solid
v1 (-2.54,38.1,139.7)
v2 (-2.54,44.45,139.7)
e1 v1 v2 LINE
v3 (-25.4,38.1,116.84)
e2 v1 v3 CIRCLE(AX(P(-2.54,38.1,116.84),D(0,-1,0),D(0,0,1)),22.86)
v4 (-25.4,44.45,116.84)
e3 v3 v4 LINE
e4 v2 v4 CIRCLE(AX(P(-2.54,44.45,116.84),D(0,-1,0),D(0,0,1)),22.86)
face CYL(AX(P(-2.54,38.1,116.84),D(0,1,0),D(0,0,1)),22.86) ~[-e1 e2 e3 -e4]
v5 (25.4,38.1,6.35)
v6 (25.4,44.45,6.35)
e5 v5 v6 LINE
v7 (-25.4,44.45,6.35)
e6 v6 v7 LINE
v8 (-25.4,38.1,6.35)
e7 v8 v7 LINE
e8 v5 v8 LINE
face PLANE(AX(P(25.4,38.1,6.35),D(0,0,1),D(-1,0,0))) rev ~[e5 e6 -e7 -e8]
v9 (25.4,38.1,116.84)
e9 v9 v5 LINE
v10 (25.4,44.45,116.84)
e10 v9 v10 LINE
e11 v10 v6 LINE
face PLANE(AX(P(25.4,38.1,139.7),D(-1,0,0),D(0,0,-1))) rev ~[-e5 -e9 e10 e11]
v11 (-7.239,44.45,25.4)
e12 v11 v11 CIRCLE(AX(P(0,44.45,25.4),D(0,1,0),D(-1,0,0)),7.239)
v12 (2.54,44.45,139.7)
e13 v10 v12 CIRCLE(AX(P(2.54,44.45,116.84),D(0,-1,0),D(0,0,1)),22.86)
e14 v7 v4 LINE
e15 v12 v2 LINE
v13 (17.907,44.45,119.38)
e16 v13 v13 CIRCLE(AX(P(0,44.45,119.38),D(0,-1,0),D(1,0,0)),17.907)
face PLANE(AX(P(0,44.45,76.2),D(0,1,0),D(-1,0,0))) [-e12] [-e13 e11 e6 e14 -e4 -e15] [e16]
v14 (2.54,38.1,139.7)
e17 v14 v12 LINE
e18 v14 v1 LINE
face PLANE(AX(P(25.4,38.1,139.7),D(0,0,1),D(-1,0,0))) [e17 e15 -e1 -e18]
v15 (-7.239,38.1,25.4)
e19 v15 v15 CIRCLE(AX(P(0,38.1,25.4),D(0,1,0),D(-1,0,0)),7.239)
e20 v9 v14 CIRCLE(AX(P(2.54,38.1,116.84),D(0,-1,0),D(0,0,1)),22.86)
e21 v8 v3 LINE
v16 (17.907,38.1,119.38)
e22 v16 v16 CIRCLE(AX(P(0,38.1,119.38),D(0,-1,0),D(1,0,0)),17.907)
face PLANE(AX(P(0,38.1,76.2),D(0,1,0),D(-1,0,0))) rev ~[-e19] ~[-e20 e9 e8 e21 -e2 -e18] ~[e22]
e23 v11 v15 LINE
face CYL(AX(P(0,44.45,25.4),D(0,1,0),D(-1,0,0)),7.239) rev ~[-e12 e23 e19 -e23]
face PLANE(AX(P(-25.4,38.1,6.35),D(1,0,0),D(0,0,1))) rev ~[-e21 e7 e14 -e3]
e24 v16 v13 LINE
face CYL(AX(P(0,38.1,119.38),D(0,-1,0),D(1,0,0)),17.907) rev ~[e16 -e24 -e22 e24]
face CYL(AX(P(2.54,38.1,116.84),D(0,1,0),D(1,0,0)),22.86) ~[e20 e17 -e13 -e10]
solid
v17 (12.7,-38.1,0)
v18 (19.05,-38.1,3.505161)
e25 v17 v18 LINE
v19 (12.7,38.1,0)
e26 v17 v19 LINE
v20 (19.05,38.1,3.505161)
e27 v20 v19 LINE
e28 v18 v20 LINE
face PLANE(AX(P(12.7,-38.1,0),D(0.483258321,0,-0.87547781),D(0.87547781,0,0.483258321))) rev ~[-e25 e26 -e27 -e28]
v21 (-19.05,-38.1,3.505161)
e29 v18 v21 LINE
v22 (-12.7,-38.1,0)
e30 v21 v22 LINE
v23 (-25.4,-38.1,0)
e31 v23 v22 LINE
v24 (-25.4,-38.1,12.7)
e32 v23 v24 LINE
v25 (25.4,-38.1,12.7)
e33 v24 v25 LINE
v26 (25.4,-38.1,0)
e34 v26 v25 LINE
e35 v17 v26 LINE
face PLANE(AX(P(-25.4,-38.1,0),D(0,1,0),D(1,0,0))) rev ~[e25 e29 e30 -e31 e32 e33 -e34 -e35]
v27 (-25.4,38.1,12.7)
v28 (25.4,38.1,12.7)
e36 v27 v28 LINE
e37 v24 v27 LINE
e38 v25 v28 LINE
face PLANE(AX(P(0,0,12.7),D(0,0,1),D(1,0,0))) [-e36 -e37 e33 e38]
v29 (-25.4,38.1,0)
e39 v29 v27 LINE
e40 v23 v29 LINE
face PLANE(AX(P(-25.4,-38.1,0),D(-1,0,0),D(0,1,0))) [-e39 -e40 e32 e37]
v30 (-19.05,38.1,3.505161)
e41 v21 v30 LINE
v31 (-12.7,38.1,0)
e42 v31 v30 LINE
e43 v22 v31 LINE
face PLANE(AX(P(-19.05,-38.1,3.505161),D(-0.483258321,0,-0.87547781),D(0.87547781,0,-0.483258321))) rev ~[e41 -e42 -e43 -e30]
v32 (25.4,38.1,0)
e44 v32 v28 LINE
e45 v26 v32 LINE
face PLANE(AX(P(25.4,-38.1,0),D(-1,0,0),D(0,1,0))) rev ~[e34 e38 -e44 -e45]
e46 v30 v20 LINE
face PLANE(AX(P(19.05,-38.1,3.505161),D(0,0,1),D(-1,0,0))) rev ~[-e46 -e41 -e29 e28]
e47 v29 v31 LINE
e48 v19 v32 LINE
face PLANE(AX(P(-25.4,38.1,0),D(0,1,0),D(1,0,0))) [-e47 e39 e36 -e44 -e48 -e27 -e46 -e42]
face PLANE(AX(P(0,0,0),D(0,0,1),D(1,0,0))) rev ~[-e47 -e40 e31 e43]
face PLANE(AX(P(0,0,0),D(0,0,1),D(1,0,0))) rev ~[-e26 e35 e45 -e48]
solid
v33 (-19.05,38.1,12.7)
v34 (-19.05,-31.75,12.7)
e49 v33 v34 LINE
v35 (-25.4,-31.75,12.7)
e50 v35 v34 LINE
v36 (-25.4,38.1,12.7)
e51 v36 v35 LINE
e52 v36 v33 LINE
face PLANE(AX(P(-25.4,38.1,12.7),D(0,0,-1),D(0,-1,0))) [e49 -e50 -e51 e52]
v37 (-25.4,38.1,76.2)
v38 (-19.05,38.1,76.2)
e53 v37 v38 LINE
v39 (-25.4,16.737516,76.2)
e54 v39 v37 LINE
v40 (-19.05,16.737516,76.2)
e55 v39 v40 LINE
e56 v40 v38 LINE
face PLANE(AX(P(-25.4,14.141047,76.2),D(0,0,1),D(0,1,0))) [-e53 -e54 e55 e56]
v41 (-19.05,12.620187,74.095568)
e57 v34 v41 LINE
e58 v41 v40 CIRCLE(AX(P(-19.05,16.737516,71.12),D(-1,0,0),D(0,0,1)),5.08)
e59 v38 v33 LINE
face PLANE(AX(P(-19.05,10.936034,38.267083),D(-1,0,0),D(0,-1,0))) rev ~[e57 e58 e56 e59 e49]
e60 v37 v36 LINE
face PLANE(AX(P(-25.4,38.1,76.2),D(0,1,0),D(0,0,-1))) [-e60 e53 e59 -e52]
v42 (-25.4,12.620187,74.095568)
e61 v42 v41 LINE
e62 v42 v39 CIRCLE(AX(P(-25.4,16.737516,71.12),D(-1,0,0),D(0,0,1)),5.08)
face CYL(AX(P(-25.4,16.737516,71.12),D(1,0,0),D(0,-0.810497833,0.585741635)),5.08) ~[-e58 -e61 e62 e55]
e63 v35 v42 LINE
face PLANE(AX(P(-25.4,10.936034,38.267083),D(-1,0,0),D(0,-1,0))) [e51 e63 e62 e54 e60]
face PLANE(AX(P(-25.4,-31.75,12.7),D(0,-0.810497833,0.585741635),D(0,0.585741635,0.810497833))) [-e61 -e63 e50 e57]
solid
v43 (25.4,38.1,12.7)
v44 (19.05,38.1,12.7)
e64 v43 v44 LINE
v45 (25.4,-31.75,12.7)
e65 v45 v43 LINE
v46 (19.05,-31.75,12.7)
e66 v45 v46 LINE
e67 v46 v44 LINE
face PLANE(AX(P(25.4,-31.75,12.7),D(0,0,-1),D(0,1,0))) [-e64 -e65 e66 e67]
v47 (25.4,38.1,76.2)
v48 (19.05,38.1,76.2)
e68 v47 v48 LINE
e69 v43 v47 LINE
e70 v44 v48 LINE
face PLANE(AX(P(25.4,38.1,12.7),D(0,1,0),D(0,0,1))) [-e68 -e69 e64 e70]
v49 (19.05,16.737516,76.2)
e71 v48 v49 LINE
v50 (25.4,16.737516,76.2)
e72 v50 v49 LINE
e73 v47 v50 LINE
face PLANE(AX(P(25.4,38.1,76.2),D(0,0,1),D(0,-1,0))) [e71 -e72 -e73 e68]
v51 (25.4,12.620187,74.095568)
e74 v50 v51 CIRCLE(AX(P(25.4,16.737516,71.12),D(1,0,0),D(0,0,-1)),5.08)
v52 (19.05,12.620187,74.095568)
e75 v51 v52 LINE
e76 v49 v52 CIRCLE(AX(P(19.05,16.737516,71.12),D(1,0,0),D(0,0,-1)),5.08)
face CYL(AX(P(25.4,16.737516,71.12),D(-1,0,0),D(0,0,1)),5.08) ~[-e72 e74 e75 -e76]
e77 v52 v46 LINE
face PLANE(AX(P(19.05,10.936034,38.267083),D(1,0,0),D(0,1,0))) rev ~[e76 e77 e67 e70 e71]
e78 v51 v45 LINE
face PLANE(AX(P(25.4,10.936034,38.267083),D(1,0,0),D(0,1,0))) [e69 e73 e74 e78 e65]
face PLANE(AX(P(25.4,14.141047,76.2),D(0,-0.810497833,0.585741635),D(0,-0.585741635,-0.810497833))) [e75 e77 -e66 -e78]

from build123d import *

# Parameters (mm, degrees)
F0_W      = 50.8
F0_H      = 76.2
F1_DEPTH  = 12.7
F2_W      = 50.8
F2_H      = 127
F2_H_2    = 6.35
F3_DEPTH  = 6.35
F5_DEPTH  = 6.35
F7_DEPTH  = 6.35
F8_R      = 5.08
F8_2_R    = 5.08
F9_R      = 17.907
F10_DEPTH = 25.4
F12_DEPTH = 82.55
F13_R     = 22.86
F14_R     = 7.239
F15_DEPTH = 82.551


# Not quite as in the source:
# - a feature names something its author has since deleted; it is built from what else it names


with BuildPart() as f1:
    # F0 (on Top) → F1 (new body)
    with BuildSketch(Plane.XY):
        Rectangle(F0_W, F0_H)
    extrude(amount=F1_DEPTH)

    # F11 (on face) → F12 (cut, through all)
    with BuildSketch(Plane.XZ.offset(38.1)):
        Polygon((-12.7, 0), (0, 0), (12.7, 0), (19.05, 3.5051606157), (-19.05, 3.5051606157), align=None)
    extrude(amount=-F12_DEPTH, mode=Mode.SUBTRACT)


with BuildPart() as f3:
    # F2 (on face) → F3 (new body)
    with BuildSketch(Plane(origin=(0, 38.1, 0), x_dir=(-1, 0, 0), z_dir=(0, 1, 0))):
        with Locations((0, 76.2)):
            Rectangle(F2_W, F2_H)
        with Locations((0, 9.525)):
            Rectangle(F2_W, F2_H_2)
    extrude(amount=F3_DEPTH)

    # F9 (on face) → F10 (cut)
    with BuildSketch(Plane.XZ.offset(-38.1)):
        with Locations((0, 119.38)):
            Circle(F9_R)
    extrude(amount=-F10_DEPTH, mode=Mode.SUBTRACT)

    # F13
    f13_edges = [f3.edges().sort_by_distance(p)[0] for p in [
        (25.4, 41.275, 139.7),
        (-25.4, 41.275, 139.7),
    ]]
    fillet(f13_edges, radius=F13_R)

    # F14 (on face) → F15 (cut, through all)
    with BuildSketch(Plane(origin=(0, 44.45, 0), x_dir=(-1, 0, 0), z_dir=(0, 1, 0))):
        with Locations((0, 25.4)):
            Circle(F14_R)
    extrude(amount=-F15_DEPTH, mode=Mode.SUBTRACT)


with BuildPart() as f5:
    # F4 (on face) → F5 (new body)
    with BuildSketch(Plane.YZ.offset(25.4)):
        Polygon((-31.75, 12.7), (38.1, 12.7), (38.1, 76.2), (14.1410465515, 76.2), align=None)
    extrude(amount=-F5_DEPTH)

    # F8#2
    f8_2_edges = [f5.edges().sort_by_distance(p)[0] for p in [
        (22.225, 14.141047, 76.2),
    ]]
    fillet(f8_2_edges, radius=F8_2_R)


with BuildPart() as f7:
    # F6 (on face) → F7 (new body)
    with BuildSketch(Plane(origin=(-25.4, 0, 0), x_dir=(0, -1, 0), z_dir=(-1, 0, 0))):
        Polygon((-38.1, 76.2), (-38.1, 12.7), (31.75, 12.7), (-14.1410465515, 76.2), align=None)
    extrude(amount=-F7_DEPTH)

    # F8
    f8_edges = [f7.edges().sort_by_distance(p)[0] for p in [
        (-22.225, 14.141047, 76.2),
    ]]
    fillet(f8_edges, radius=F8_R)


solid = Compound([f1.part, f3.part, f5.part, f7.part])
